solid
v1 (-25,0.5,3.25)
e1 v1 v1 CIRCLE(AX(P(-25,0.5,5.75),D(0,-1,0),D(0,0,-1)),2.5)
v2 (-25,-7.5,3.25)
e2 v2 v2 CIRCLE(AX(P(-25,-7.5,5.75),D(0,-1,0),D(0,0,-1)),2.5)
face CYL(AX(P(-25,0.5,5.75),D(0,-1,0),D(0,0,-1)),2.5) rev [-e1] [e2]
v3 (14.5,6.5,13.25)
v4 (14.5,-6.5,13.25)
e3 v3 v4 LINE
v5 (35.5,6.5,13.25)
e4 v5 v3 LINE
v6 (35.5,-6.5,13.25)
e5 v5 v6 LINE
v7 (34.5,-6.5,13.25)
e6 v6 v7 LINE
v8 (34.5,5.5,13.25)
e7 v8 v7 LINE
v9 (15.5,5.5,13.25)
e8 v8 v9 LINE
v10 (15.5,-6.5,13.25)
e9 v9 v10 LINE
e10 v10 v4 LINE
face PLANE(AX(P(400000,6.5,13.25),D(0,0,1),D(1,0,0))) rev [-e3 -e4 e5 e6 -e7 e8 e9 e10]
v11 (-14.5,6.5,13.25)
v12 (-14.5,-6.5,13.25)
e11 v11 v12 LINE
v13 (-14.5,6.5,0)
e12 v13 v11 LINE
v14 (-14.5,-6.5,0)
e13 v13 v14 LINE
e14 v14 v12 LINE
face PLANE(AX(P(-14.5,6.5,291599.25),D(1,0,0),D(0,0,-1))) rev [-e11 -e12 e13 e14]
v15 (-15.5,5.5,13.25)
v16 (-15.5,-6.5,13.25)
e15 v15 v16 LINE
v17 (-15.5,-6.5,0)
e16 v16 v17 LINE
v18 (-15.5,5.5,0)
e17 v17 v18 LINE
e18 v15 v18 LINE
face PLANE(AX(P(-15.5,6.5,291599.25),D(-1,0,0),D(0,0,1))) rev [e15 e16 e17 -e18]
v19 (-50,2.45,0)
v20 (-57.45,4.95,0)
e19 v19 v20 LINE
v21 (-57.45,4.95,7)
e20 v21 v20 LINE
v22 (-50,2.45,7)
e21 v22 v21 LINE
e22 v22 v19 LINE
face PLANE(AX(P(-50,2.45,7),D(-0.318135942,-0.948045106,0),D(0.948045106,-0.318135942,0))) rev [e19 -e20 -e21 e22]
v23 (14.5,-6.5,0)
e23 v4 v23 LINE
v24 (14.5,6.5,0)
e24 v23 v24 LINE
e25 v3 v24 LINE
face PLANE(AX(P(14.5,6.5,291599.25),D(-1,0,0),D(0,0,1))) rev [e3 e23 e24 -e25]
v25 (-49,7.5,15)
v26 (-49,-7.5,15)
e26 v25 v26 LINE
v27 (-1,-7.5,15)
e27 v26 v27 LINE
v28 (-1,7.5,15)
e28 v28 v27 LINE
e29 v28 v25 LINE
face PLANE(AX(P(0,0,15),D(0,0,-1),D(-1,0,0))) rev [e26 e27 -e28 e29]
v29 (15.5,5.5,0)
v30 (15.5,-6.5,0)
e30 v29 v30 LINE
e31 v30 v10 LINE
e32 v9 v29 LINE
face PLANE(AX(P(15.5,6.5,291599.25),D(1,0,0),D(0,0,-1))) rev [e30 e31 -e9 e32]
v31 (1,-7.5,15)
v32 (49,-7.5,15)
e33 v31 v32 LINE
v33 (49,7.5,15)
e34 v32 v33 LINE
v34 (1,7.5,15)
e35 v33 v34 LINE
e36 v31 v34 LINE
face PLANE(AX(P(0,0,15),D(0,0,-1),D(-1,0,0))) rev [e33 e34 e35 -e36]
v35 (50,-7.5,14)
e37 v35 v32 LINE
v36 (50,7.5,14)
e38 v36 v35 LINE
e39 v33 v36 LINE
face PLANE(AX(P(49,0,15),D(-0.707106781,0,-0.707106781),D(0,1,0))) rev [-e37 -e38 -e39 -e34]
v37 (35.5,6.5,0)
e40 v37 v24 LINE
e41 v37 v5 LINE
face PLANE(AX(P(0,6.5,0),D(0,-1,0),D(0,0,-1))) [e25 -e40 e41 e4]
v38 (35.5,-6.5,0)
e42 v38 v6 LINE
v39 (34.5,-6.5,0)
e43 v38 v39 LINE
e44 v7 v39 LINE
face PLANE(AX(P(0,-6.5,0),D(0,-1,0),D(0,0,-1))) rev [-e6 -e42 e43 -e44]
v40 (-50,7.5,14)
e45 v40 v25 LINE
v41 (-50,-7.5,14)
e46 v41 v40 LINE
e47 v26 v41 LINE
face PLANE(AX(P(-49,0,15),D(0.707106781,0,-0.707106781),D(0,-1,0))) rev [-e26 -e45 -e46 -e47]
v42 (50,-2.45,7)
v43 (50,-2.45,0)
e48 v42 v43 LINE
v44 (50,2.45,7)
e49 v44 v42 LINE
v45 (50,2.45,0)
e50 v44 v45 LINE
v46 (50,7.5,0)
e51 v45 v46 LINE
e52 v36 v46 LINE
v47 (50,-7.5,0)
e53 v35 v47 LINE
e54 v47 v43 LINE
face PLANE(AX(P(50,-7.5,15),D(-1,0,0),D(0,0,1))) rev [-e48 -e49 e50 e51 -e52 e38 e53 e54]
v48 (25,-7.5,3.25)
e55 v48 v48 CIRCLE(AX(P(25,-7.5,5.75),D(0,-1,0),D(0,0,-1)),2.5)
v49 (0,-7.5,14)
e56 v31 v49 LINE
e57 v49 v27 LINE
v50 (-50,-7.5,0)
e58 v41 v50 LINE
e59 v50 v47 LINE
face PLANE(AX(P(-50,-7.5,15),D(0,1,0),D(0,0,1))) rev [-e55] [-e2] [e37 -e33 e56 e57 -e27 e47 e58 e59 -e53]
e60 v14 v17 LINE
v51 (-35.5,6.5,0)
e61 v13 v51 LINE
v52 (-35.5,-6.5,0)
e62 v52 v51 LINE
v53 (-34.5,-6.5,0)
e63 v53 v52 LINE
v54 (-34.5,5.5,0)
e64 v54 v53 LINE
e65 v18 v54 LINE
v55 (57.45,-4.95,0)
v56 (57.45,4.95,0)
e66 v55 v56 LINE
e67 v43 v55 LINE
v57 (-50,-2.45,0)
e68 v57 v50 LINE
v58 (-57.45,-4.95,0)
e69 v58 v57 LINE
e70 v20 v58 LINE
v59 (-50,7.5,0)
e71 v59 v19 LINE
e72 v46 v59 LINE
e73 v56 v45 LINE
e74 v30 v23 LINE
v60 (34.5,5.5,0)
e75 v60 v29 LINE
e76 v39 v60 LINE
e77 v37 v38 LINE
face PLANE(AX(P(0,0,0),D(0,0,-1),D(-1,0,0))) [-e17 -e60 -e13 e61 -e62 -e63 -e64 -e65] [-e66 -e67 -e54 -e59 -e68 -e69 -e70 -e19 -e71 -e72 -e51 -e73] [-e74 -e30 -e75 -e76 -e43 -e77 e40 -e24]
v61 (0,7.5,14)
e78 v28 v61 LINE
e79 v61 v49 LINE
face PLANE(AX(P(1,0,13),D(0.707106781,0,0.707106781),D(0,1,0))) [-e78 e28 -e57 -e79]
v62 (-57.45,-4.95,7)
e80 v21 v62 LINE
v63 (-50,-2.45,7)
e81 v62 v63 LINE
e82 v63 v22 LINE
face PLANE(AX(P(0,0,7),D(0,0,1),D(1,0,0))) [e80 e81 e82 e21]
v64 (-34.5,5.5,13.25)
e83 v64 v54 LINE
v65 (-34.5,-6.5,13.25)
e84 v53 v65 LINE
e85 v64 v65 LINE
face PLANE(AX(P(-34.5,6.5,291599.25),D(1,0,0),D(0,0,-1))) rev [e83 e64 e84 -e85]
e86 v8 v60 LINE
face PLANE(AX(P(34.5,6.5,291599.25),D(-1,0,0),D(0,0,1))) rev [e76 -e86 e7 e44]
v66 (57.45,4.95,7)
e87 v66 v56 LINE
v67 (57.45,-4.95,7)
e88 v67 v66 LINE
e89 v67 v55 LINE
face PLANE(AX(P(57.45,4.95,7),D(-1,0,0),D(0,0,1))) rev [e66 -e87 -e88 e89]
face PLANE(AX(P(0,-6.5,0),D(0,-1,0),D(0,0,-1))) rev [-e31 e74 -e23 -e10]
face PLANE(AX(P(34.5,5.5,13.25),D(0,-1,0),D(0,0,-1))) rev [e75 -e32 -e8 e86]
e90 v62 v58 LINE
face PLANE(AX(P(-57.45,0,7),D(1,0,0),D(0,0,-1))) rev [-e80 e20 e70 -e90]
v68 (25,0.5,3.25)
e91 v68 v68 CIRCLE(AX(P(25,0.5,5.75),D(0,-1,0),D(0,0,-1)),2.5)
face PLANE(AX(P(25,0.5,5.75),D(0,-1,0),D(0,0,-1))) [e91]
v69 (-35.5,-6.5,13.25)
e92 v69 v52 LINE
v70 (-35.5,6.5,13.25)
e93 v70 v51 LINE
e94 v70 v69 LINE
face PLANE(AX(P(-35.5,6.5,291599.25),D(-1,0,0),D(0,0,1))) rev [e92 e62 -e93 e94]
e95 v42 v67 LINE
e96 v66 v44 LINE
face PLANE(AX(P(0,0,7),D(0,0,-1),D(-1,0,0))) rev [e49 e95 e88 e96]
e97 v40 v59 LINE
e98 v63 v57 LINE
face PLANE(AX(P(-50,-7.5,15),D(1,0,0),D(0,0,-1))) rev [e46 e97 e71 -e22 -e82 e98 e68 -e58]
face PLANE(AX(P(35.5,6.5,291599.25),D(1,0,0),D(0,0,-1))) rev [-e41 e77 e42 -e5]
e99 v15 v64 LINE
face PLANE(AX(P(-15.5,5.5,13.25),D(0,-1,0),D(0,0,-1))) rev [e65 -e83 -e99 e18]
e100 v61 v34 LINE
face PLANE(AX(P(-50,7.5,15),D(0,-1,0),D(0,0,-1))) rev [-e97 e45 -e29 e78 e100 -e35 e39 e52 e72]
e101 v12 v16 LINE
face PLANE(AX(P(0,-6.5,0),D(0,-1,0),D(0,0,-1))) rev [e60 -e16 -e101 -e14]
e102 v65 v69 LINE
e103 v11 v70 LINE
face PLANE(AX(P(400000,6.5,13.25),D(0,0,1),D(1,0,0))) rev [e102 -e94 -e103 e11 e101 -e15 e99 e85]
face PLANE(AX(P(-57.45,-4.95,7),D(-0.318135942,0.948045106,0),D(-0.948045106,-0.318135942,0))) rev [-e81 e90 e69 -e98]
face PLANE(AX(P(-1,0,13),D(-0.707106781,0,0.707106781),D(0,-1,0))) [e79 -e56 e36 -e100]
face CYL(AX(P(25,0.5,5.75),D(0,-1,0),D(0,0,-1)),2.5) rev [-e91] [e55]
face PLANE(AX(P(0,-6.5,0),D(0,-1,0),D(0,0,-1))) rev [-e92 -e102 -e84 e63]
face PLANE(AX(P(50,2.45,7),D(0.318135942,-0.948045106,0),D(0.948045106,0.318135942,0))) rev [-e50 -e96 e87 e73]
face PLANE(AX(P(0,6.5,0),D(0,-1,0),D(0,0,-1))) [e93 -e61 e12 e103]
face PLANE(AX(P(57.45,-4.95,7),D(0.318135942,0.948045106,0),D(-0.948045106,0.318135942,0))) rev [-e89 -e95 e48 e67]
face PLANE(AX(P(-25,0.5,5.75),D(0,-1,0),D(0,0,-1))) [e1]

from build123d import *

# Parameters (mm, degrees)
SKETCH1_W              = 100
SKETCH1_H              = 15
BODY_DEPTH             = 15
CLICK_DEPTH            = 7
CLICK_CHAMFER_SIZE     = 1
SKETCH3_R              = 2.5
LED_HOLE_DEPTH         = 8
SKETCH4_W              = 2
SKETCH4_H              = 15
FIELDMARK_DEPTH        = 2
FIELDMARK_CHAMFER_SIZE = 2
LIGHT_START            = -1
SKETCH6_W              = 1
SKETCH6_H              = 15
LIGHT_GUIDE_DEPTH      = 13
SKETCH7_W              = 19
SKETCH7_H              = 1
CUT_EXTRUDE1_DEPTH     = 13.25


with BuildPart() as part:
    # Sketch1 → Body (new body)
    with BuildSketch(Plane.XY):
        Rectangle(SKETCH1_W, SKETCH1_H)
    extrude(amount=BODY_DEPTH)

    # Sketch2 → Click (add)
    with BuildSketch(Plane.XY):
        Polygon((-50, 0), (-50, 2.45), (-57.45, 4.95), (-57.45, 0), (-57.45, -4.95), (-50, -2.45), align=None)
        Polygon((57.45, 0), (57.45, -4.95), (50, -2.45), (50, 0), (50, 2.45), (57.45, 4.95), align=None)
    extrude(amount=CLICK_DEPTH)

    # Click Chamfer
    click_chamfer_edges = [part.edges().sort_by_distance(p)[0] for p in [
        (-50, 0, 15),
        (50, 0, 15),
    ]]
    chamfer(click_chamfer_edges, length=CLICK_CHAMFER_SIZE)

    # Sketch3 → LED Hole (cut)
    with BuildSketch(Plane.XZ.offset(7.5)):
        with Locations(Location((-25, 5.75, 0), (0, 0, 270))):
            Circle(SKETCH3_R)
        with Locations(Location((25, 5.75, 0), (0, 0, 270))):
            Circle(SKETCH3_R)
    extrude(amount=-LED_HOLE_DEPTH, mode=Mode.SUBTRACT)

    # Sketch4 → FieldMark (cut)
    with BuildSketch(Plane.XY.offset(15)):
        Rectangle(SKETCH4_W, SKETCH4_H)
    extrude(amount=-FIELDMARK_DEPTH, mode=Mode.SUBTRACT)

    # FieldMark Chamfer
    # the kernel refuses this chamfer: 2 mm, written as the material it adds along each edge
    with BuildSketch(Plane(origin=(1, -7.5, 13), x_dir=(0.02749587661058638, 0, 0.9996219169112968), z_dir=(0, 1, 0))) as fieldmark_chamfer_piece_1_section:
        Polygon((FIELDMARK_CHAMFER_SIZE * 0.999621916911, -FIELDMARK_CHAMFER_SIZE * 0.0274958766106), (-FIELDMARK_CHAMFER_SIZE * 0.0274958766106, -FIELDMARK_CHAMFER_SIZE * 0.999621916911), (0, 0), align=None)
    fieldmark_chamfer_piece_1 = extrude(amount=15, mode=Mode.PRIVATE)
    fieldmark_chamfer_piece_1 = split(fieldmark_chamfer_piece_1, bisect_by=Plane(origin=(0.339191691, 0, 15), z_dir=(0, 0, -1)), keep=Keep.TOP, mode=Mode.PRIVATE)
    add(fieldmark_chamfer_piece_1)
    with BuildSketch(Plane(origin=(-1, 7.5, 13), x_dir=(0.9996219169112968, 0, -0.027495876610586487), z_dir=(0, -1, 0))) as fieldmark_chamfer_piece_2_section:
        Polygon((FIELDMARK_CHAMFER_SIZE * 0.999621916911, FIELDMARK_CHAMFER_SIZE * 0.0274958766106), (-FIELDMARK_CHAMFER_SIZE * 0.0274958766106, FIELDMARK_CHAMFER_SIZE * 0.999621916911), (0, 0), align=None)
    fieldmark_chamfer_piece_2 = extrude(amount=15, mode=Mode.PRIVATE)
    fieldmark_chamfer_piece_2 = split(fieldmark_chamfer_piece_2, bisect_by=Plane(origin=(-0.339191691, 0, 15), z_dir=(0, 0, -1)), keep=Keep.TOP, mode=Mode.PRIVATE)
    add(fieldmark_chamfer_piece_2)

    # Sketch6 → Light Guide (cut)
    with BuildSketch(Plane.XZ.offset(7.5).offset(LIGHT_START)):
        with Locations((35, 5.75)):
            Rectangle(SKETCH6_W, SKETCH6_H)
        with Locations((15, 5.75)):
            Rectangle(SKETCH6_W, SKETCH6_H)
        with Locations((-15, 5.75)):
            Rectangle(SKETCH6_W, SKETCH6_H)
        with Locations((-35, 5.75)):
            Rectangle(SKETCH6_W, SKETCH6_H)
    extrude(amount=-LIGHT_GUIDE_DEPTH, mode=Mode.SUBTRACT)

    # Sketch7 → Cut-Extrude1 (cut)
    with BuildSketch(Plane(origin=(0, 0, 0), x_dir=(-1, 0, 0), z_dir=(0, 0, -1))):
        with Locations((25, 6)):
            Rectangle(SKETCH7_W, SKETCH7_H)
        with Locations((-25, 6)):
            Rectangle(SKETCH7_W, SKETCH7_H)
    extrude(amount=-CUT_EXTRUDE1_DEPTH, mode=Mode.SUBTRACT)


solid = part.part
